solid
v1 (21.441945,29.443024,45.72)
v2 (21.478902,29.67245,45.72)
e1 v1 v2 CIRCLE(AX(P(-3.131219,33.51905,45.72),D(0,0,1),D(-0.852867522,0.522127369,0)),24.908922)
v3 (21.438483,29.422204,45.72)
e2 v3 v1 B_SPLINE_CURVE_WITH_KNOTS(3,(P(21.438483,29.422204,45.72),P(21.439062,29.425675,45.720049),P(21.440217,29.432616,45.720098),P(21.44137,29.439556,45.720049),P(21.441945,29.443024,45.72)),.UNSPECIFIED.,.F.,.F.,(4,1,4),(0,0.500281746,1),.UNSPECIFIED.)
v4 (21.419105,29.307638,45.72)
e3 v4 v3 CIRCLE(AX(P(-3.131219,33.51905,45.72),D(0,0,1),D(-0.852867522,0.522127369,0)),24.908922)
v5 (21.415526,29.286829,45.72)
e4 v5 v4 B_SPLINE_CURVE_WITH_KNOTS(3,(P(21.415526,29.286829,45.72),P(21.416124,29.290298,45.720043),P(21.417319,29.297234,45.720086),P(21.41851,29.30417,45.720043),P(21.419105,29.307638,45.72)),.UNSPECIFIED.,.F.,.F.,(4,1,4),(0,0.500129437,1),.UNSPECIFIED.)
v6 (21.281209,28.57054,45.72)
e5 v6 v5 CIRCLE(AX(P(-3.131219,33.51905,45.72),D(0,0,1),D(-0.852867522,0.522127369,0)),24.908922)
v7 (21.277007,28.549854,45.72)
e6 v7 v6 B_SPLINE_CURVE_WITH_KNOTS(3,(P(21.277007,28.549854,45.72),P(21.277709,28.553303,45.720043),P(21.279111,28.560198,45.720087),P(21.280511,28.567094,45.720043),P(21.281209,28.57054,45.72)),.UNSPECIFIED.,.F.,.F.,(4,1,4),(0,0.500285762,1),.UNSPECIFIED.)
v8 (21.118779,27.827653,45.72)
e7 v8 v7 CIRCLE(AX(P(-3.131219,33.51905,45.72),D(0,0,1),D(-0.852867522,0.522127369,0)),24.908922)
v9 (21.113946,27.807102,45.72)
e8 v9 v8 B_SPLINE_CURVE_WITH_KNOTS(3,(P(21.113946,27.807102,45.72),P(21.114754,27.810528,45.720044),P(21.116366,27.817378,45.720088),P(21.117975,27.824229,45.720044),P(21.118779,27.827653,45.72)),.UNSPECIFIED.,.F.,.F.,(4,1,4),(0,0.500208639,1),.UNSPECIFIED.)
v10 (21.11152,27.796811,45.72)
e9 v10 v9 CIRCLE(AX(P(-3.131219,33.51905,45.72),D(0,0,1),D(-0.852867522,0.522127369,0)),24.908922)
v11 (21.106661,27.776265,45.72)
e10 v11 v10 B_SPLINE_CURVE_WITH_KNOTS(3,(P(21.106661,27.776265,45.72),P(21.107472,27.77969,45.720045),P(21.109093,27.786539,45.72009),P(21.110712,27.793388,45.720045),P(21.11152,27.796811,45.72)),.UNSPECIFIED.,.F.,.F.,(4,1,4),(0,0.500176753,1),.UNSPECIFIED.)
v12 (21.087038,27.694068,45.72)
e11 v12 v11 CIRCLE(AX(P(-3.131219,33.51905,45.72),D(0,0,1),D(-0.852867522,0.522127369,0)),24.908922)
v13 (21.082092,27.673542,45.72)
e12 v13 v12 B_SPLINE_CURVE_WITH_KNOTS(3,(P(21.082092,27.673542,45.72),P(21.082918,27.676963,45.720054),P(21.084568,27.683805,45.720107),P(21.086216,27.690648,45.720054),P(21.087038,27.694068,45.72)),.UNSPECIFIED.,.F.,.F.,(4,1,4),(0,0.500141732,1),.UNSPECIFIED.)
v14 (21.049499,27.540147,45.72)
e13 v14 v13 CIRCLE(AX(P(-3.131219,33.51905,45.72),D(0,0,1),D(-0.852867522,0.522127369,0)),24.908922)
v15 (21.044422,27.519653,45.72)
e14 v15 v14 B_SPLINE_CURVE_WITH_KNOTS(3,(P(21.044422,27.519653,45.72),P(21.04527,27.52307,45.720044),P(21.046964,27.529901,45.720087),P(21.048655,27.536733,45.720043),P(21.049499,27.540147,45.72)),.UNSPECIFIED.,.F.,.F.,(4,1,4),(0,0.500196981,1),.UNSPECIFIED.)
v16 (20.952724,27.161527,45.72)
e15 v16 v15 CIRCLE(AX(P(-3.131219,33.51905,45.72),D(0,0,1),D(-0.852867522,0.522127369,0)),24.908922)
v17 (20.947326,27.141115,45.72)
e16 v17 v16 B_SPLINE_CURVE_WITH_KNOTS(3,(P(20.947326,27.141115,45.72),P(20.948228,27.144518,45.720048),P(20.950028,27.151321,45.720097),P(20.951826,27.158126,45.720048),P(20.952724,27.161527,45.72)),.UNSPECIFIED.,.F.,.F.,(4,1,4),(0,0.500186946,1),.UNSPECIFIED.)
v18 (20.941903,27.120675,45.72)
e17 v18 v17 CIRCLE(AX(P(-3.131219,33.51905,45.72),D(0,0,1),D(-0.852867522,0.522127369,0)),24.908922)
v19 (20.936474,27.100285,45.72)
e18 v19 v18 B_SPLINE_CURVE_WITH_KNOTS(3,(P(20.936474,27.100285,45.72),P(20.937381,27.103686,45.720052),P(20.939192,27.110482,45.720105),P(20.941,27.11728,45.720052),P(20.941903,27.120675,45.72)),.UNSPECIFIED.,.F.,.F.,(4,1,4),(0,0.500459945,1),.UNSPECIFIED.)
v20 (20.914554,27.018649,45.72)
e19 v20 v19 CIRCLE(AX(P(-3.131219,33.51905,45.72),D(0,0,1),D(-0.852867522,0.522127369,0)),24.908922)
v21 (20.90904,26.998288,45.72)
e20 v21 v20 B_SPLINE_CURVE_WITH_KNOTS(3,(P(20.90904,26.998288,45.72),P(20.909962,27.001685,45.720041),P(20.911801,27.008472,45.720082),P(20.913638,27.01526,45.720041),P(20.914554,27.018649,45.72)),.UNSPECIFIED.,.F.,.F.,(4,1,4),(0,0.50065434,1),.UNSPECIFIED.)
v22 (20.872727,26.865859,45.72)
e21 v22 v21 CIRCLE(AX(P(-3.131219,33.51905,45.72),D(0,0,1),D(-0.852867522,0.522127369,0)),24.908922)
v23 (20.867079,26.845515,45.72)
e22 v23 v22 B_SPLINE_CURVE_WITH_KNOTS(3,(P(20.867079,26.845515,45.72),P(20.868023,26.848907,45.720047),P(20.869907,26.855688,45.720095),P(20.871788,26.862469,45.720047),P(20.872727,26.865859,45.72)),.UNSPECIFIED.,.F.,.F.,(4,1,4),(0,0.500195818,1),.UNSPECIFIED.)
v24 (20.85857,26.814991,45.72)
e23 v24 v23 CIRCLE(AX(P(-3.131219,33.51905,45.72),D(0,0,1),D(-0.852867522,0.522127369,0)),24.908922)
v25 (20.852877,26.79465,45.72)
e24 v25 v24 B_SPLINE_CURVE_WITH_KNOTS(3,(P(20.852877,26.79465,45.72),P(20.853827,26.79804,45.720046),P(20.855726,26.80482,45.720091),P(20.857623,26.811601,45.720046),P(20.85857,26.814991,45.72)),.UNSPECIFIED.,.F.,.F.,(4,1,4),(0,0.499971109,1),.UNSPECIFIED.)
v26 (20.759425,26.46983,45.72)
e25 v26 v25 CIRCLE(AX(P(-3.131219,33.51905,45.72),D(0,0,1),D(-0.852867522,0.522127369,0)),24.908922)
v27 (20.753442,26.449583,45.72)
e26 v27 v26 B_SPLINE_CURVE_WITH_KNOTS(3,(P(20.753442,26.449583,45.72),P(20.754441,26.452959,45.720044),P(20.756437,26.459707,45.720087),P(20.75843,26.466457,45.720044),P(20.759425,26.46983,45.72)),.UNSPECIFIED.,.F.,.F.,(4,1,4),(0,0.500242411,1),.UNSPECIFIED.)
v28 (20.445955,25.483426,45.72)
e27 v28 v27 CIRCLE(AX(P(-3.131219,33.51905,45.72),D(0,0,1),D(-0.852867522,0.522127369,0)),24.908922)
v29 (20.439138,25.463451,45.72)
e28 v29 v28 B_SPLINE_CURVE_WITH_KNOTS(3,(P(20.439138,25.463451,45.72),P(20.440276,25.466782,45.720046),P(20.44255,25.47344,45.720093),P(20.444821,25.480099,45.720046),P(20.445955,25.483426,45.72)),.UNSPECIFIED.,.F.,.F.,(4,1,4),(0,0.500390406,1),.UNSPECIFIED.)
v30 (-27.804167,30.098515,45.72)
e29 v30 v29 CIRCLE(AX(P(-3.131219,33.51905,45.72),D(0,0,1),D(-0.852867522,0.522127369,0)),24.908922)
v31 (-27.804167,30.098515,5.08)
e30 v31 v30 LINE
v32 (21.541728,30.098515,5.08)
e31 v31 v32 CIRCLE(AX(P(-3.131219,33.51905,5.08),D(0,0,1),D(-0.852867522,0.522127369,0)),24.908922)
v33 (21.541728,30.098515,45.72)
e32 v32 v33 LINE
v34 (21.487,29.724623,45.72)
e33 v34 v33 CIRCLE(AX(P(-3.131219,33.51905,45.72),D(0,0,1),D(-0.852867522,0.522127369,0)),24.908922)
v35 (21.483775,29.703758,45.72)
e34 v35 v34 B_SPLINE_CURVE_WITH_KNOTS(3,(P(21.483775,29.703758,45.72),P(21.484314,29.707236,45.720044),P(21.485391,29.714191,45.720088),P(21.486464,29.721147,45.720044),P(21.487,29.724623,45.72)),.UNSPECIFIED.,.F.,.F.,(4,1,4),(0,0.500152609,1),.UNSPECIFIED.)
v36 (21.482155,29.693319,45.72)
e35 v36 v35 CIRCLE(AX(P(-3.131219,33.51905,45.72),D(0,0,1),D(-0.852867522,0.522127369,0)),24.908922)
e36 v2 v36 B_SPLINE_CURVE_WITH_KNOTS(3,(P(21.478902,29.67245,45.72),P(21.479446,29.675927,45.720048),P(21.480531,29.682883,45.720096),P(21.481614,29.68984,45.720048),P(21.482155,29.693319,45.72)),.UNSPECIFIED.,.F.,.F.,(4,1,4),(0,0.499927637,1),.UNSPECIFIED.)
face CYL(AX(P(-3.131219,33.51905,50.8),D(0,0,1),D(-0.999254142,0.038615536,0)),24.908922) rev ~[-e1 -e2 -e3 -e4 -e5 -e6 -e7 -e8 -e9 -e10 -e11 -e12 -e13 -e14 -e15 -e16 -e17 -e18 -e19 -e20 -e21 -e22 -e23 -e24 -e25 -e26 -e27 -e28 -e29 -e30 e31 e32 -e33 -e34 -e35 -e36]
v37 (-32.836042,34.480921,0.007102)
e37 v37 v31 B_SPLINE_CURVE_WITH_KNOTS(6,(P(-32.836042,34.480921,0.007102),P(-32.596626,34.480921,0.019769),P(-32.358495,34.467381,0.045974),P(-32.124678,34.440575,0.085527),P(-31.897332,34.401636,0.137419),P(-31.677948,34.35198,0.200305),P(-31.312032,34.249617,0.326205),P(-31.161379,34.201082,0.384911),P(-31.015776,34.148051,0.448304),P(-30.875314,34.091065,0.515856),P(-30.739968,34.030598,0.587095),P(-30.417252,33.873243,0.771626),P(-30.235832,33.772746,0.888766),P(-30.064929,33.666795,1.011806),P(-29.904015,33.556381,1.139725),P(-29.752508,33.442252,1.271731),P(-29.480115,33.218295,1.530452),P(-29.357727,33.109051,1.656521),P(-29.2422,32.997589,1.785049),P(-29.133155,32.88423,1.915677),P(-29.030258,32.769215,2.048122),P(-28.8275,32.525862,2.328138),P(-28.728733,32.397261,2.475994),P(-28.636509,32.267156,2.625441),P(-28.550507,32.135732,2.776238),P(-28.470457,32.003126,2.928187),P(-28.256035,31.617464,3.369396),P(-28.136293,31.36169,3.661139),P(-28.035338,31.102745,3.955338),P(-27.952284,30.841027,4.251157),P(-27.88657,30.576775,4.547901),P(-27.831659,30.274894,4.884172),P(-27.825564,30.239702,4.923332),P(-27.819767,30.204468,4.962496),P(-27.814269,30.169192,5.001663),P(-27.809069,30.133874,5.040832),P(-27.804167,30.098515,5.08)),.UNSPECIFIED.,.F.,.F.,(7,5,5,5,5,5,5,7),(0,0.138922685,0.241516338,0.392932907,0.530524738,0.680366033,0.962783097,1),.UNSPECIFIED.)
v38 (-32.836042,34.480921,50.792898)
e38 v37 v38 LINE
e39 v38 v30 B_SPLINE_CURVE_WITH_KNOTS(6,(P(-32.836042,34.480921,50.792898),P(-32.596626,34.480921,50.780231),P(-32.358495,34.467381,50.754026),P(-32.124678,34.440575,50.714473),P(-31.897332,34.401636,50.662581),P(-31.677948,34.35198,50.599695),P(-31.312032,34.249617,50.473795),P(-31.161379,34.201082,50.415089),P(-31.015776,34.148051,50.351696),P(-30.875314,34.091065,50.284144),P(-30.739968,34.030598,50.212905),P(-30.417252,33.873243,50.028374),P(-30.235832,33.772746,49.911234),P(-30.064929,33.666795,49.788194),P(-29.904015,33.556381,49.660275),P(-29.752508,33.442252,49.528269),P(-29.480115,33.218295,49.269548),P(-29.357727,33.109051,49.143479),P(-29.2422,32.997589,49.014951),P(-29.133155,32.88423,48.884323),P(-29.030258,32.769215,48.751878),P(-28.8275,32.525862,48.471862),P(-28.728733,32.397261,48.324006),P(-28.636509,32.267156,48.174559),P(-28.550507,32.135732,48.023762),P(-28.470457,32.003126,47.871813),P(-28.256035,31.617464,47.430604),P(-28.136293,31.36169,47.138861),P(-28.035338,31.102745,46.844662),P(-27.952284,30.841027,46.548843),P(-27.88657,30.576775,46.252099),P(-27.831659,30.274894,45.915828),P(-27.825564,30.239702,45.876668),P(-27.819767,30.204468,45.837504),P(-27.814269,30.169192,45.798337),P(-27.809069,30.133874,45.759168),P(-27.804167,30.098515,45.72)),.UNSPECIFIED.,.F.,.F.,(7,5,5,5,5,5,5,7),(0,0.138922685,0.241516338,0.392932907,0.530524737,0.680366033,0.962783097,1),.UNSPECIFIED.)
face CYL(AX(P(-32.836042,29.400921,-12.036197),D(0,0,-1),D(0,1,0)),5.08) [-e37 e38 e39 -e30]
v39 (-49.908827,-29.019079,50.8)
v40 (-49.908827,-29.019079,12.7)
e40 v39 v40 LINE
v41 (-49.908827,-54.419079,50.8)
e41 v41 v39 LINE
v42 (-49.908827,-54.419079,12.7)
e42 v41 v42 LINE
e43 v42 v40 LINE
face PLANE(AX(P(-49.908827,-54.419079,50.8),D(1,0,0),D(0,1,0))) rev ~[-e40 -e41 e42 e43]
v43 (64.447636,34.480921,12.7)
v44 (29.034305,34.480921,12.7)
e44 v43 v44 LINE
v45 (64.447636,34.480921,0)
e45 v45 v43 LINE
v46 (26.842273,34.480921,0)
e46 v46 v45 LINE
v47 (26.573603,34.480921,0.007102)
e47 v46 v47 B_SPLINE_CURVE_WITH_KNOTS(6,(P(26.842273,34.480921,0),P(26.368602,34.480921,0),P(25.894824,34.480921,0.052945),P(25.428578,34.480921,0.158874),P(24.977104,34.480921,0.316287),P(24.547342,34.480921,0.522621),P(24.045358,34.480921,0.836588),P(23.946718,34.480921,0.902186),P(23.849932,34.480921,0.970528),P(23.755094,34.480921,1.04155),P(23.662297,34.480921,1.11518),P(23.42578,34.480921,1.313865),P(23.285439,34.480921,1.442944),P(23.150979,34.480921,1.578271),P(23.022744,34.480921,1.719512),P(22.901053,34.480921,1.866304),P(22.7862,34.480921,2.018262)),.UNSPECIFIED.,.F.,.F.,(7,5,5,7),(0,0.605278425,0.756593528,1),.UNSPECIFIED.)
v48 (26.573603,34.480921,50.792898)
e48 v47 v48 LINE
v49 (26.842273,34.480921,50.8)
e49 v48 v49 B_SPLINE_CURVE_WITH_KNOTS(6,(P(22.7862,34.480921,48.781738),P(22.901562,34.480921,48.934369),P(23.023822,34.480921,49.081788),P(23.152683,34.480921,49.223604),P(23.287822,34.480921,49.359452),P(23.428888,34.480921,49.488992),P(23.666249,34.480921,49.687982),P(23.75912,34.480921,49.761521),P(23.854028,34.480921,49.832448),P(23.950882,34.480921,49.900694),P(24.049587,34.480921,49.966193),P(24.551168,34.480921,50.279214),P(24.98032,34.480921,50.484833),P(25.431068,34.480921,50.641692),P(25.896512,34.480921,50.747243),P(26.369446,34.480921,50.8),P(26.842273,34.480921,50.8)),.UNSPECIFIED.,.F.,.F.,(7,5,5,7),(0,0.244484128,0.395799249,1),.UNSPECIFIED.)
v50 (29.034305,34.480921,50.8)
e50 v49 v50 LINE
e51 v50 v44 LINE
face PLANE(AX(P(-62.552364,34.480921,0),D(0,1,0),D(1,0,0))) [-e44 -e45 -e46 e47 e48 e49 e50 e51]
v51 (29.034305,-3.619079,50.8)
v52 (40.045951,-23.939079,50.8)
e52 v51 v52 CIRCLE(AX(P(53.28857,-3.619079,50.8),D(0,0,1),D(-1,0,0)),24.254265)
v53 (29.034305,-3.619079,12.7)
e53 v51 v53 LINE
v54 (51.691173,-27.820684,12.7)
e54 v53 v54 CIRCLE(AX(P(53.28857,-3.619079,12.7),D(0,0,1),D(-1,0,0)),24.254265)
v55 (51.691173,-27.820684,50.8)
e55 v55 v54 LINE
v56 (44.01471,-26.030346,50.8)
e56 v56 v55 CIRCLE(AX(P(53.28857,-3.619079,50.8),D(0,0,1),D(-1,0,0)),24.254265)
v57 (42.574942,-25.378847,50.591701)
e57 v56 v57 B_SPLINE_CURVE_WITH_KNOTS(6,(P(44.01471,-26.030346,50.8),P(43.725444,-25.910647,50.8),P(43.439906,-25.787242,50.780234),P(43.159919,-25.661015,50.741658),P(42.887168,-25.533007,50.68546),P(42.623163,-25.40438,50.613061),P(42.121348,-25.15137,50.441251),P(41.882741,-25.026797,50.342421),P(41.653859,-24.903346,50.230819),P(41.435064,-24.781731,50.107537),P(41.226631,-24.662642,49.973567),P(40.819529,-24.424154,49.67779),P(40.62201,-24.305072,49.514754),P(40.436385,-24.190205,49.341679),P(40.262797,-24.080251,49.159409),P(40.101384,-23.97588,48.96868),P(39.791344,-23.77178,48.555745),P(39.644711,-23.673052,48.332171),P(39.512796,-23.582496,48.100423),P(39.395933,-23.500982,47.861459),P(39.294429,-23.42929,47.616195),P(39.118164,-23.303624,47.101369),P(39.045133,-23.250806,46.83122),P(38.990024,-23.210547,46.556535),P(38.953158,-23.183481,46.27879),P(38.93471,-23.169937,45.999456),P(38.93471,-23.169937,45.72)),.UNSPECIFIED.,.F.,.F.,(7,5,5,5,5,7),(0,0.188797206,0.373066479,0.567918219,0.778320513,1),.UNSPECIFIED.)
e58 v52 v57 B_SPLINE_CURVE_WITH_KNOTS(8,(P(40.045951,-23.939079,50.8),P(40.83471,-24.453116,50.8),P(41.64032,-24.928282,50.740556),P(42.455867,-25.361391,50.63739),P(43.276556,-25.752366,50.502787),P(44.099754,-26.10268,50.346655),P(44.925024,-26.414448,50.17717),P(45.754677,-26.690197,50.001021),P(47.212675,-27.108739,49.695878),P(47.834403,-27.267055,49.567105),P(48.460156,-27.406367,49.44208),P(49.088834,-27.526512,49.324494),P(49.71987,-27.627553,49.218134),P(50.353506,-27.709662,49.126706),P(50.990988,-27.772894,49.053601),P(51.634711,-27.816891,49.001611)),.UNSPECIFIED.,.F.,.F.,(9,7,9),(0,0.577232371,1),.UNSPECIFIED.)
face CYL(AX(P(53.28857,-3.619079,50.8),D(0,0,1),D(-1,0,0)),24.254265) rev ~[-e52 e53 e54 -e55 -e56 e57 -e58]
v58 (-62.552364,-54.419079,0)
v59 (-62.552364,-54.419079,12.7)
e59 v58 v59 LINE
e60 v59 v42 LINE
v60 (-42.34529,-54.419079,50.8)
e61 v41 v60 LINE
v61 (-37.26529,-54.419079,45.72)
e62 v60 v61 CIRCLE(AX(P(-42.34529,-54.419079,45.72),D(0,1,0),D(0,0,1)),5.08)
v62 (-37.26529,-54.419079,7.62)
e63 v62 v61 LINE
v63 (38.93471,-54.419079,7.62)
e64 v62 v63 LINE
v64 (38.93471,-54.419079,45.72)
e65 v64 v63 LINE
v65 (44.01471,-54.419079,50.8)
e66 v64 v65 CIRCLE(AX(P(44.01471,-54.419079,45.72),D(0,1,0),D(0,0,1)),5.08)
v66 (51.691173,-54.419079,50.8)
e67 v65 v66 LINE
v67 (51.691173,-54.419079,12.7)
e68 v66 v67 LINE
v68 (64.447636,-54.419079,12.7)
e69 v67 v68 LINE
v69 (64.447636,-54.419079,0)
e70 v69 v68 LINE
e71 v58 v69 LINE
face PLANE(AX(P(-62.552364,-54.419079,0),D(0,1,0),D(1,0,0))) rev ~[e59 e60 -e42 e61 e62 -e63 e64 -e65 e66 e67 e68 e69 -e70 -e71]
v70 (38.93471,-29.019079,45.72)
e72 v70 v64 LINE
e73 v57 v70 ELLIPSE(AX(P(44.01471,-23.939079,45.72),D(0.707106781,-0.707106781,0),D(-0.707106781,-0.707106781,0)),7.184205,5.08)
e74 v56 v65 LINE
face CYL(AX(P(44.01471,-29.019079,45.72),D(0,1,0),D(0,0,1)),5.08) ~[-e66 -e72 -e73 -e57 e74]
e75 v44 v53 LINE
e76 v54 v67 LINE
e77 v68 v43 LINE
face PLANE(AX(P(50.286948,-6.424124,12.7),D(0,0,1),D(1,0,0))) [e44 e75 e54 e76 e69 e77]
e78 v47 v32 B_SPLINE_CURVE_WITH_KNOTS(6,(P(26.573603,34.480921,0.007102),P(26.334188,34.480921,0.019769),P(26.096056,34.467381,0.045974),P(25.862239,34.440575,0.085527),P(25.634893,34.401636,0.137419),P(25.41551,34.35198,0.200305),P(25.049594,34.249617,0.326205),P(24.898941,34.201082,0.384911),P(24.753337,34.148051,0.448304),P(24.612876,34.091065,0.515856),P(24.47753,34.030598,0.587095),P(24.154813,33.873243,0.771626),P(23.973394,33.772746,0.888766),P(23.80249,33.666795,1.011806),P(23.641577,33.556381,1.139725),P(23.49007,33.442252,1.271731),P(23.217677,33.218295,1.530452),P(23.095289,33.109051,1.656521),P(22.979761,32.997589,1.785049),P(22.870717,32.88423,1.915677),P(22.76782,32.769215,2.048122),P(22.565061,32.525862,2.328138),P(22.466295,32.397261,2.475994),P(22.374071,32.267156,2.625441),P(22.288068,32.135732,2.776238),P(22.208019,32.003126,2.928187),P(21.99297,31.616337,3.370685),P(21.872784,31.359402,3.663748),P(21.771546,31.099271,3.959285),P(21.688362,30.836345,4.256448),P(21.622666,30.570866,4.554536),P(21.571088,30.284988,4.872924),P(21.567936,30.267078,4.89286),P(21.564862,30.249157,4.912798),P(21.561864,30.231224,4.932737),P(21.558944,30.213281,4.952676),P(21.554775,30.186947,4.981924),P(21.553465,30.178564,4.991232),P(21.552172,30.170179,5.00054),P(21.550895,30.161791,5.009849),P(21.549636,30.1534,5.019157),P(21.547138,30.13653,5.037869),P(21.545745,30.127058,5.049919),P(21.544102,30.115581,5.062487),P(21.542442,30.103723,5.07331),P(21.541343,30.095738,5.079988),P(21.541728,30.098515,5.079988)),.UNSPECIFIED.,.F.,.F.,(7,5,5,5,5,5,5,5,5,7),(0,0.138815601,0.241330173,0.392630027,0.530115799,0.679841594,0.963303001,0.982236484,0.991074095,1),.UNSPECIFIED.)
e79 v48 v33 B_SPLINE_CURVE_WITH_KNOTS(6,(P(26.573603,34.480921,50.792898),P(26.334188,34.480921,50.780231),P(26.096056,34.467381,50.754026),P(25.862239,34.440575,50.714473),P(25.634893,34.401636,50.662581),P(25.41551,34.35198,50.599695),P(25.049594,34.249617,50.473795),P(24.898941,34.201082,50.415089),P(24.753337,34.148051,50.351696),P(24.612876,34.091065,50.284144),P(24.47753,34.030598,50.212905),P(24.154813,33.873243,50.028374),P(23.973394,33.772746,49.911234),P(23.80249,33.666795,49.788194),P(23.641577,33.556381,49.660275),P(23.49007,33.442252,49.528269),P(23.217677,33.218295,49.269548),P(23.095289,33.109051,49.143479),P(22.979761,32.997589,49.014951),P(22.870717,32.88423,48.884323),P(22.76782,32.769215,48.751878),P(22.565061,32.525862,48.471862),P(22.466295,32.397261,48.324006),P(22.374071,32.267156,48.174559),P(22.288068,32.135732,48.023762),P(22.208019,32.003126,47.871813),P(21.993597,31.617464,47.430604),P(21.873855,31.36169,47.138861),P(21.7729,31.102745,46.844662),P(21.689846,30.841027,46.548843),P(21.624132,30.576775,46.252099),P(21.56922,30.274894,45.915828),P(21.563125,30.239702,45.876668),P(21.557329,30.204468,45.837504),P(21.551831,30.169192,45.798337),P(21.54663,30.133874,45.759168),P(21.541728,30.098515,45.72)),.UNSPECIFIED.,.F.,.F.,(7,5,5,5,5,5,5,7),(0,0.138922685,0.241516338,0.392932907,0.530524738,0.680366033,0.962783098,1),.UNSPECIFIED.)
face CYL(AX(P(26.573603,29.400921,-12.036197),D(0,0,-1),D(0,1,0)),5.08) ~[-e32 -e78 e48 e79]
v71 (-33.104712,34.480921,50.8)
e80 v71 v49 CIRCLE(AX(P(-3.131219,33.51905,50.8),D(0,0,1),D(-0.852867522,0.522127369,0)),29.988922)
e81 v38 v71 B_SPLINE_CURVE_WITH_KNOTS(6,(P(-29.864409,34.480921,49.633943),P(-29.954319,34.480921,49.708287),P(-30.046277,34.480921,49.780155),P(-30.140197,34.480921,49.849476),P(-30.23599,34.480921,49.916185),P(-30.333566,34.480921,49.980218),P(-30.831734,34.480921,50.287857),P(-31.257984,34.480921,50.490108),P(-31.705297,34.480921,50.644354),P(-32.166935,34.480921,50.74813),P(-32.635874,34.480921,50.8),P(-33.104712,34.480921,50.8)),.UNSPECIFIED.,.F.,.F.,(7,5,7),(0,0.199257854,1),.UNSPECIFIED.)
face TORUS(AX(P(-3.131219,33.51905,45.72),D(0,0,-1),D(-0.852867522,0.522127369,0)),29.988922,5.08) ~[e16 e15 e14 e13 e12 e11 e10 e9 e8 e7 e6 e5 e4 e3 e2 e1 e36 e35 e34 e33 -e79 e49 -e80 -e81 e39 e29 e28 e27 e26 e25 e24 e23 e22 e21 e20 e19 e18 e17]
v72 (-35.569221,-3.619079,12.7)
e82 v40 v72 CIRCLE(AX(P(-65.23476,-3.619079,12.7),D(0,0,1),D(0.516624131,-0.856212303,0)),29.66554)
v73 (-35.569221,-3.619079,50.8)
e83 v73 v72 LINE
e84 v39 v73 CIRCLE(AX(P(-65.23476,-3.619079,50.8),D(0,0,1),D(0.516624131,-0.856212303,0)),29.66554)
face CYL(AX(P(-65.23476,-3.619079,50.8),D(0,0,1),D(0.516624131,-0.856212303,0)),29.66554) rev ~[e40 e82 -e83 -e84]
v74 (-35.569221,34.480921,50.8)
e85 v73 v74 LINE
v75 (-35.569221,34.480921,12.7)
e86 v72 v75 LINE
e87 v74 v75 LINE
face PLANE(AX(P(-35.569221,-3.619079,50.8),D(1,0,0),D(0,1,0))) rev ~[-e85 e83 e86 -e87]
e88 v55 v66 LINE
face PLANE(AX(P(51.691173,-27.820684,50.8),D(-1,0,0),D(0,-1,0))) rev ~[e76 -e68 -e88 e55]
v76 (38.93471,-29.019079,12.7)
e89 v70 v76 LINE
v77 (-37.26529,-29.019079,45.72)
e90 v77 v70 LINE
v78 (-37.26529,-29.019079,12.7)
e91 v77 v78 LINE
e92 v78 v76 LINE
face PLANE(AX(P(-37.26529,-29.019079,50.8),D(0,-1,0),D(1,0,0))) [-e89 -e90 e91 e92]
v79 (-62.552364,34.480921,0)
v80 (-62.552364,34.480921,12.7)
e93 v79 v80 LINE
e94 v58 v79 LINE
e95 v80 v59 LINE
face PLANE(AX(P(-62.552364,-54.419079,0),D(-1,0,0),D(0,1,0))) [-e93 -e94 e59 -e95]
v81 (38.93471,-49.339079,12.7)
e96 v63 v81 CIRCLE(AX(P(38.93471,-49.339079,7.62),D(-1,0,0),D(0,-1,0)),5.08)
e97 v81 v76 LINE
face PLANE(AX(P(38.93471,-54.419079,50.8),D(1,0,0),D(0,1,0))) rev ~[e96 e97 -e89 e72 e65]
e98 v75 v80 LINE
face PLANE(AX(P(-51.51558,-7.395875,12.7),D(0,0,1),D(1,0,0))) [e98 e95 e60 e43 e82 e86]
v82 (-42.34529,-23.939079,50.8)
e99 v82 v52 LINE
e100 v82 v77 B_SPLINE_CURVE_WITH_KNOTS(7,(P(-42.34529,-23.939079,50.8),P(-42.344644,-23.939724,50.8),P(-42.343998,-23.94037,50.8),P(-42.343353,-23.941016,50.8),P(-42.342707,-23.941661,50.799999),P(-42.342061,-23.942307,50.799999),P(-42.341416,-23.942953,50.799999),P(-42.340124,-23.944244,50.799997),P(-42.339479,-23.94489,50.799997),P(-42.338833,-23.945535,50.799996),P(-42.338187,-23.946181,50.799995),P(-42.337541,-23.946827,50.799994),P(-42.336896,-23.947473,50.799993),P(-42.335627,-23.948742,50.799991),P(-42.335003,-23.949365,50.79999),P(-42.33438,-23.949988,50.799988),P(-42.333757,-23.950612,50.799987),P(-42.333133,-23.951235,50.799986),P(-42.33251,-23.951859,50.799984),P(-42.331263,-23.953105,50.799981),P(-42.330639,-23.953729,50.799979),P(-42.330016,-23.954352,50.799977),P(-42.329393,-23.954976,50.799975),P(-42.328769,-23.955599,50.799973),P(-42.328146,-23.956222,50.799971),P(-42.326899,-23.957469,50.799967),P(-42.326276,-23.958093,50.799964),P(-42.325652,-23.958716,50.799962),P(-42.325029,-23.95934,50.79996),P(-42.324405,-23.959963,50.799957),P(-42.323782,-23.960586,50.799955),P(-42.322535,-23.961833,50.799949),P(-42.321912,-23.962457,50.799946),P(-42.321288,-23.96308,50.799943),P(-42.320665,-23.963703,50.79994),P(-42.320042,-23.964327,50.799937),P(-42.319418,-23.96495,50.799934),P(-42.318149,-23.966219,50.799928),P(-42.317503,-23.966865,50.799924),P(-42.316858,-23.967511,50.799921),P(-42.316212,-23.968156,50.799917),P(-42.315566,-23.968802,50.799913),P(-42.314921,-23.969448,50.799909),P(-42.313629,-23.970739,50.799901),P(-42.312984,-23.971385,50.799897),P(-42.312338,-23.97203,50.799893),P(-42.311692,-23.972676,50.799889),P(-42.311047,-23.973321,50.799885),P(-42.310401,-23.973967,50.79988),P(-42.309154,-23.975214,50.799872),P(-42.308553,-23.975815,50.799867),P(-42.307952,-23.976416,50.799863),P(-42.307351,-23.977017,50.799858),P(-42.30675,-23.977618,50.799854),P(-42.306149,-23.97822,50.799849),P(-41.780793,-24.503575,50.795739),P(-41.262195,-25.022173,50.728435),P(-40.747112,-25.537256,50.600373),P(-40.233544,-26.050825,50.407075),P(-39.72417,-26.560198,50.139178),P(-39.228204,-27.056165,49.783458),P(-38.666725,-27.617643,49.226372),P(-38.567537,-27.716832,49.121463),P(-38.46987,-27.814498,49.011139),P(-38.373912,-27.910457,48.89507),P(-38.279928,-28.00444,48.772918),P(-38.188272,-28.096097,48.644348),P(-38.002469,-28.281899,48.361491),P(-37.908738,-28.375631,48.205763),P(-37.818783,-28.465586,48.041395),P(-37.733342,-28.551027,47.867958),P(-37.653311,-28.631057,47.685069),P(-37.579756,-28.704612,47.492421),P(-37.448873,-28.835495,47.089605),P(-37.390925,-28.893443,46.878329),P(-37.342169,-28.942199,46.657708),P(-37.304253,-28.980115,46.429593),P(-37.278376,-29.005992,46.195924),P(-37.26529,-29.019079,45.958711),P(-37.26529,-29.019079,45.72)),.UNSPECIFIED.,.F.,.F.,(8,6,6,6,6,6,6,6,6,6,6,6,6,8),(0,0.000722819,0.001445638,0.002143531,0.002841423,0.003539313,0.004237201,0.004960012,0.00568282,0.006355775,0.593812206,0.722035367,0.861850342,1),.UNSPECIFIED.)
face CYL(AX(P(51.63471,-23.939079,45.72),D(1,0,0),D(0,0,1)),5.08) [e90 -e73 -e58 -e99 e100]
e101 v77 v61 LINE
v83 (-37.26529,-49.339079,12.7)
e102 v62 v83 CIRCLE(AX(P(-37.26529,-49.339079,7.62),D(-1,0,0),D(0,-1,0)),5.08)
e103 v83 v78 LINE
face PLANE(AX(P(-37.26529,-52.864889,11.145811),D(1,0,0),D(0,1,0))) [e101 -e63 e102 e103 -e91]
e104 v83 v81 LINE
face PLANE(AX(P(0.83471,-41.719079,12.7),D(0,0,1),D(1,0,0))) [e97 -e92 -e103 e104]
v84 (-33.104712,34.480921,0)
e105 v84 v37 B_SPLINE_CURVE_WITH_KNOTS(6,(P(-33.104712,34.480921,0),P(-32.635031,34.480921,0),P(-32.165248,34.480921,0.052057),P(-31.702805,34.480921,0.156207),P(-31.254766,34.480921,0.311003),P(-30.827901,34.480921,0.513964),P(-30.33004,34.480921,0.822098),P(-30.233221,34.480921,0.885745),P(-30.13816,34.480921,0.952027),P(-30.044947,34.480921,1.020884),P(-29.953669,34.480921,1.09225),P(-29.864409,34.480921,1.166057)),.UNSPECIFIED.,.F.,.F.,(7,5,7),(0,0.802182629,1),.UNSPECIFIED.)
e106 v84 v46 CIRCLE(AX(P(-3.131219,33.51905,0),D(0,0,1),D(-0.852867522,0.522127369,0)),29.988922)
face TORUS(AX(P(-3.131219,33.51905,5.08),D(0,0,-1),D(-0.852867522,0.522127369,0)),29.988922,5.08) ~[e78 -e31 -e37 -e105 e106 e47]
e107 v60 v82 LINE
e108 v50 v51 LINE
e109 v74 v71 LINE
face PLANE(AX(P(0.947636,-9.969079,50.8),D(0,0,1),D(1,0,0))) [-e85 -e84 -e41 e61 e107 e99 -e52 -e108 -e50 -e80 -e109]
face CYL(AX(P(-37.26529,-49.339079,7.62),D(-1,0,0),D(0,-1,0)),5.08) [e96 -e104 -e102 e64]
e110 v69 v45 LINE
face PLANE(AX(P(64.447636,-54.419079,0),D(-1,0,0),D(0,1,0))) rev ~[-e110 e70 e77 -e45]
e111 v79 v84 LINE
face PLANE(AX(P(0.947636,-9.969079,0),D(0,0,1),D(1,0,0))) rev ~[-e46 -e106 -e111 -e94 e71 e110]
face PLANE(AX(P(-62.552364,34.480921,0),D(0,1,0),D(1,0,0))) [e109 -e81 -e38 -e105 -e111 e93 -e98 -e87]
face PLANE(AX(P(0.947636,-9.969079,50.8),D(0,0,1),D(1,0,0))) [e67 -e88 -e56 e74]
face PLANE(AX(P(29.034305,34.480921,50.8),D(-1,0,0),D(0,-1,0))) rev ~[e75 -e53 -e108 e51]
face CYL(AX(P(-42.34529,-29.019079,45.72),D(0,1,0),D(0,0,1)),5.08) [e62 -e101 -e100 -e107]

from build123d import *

# Parameters (mm, degrees)
F0_W         = 127
F0_H         = 88.9
F1_DEPTH     = 50.8
F3_DEPTH     = 76.2
F4_W         = 76.2
F4_H         = 25.4
F5_DEPTH     = 38.1
F7_DEPTH     = 38.1
F8_T1_DEPTH  = 76.2
F8_T3_DEPTH  = 38.1
F8_T5_DEPTH  = 74.8723933942
F8_T8_ANGLE  = 242.9501193557
F8_T10_ANGLE = 242.9501193557
F8_T15_DEPTH = 38.1
F8_S16_R     = 24.2542650998
F8_T17_DEPTH = 21
F8_T21_DEPTH = 88.9
F8_S22_R     = 24.2542650998
F8_T23_DEPTH = 46
F8_T30_DEPTH = 88.9
F8_S32_R     = 29.6655396369
F8_T33_DEPTH = 46
F8_T36_DEPTH = 38.1
F8_S38_R     = 29.6655396369
F8_T39_DEPTH = 21


# Not quite as in the source:
# - a fillet or chamfer that OpenCascade refuses, or shapes differently, is made with other operations: its cross-section is extruded or revolved along the edge and cut away or added


with BuildPart() as f1:
    # F0 (on Top) → F1 (new body)
    with BuildSketch(Plane.XY):
        with Locations((0.947636019, -9.969078747)):
            Rectangle(F0_W, F0_H)
    extrude(amount=F1_DEPTH)

    # F2 (on face) → F3 (cut)
    with BuildSketch(Plane.XY.offset(50.8)):
        with BuildLine():
            Line((21.7591244727, 34.480921253), (-28.0215628445, 34.480921253))
            ThreePointArc((-28.0215628445, 34.480921253), (-3.1312191859, 8.6101276845), (21.7591244727, 34.480921253))
        make_face()
    extrude(amount=-F3_DEPTH, mode=Mode.SUBTRACT)

    # F4 (on face) → F5 (cut)
    with BuildSketch(Plane.XY.offset(50.8)):
        with Locations((0.8347104251, -41.719078747)):
            Rectangle(F4_W, F4_H)
    extrude(amount=-F5_DEPTH, mode=Mode.SUBTRACT)

    # F6 (on face) → F7 (cut)
    with BuildSketch(Plane.XY.offset(50.8)):
        with BuildLine():
            Line((-62.552363981, -54.419078747), (-49.9088267779, -54.419078747))
            Line((-49.9088267779, -54.419078747), (-49.9088267779, -29.019078747))
            ThreePointArc((-49.9088267779, -29.019078747), (-39.401677619, -18.2031822516), (-35.5692207813, -3.619078747))
            Line((-35.5692207813, -3.619078747), (-35.5692207813, 34.480921253))
            Line((-35.5692207813, 34.480921253), (-62.552363981, 34.480921253))
            Line((-62.552363981, 34.480921253), (-62.552363981, -54.419078747))
        make_face()
        with BuildLine():
            Line((51.6911732221, -27.8206840158), (51.6911732221, -54.419078747))
            Line((51.6911732221, -54.419078747), (64.447636019, -54.419078747))
            Line((64.447636019, -54.419078747), (64.447636019, 34.480921253))
            Line((64.447636019, 34.480921253), (29.0343053639, 34.480921253))
            Line((29.0343053639, 34.480921253), (29.0343053639, -3.619078747))
            ThreePointArc((29.0343053639, -3.619078747), (35.5824546884, -20.1950505038), (51.6911732221, -27.8206840158))
        make_face()
    extrude(amount=-F7_DEPTH, mode=Mode.SUBTRACT)

    # F8: fillet of radius 5.08 on 8 edges, made by hand

    # F8_s2 → F8_t1 (cut)
    with BuildSketch(Plane.YZ.offset(-37.2652895749)):
        with BuildLine():
            ThreePointArc((-23.939078747, 50.8), (-27.5311811954, 49.3121024484), (-29.019078747, 45.72))
            Line((-29.019078747, 45.72), (-29.019078747, 50.8))
            Line((-29.019078747, 50.8), (-23.939078747, 50.8))
        make_face()
        with BuildLine():
            ThreePointArc((-54.419078747, 7.62), (-52.9311811954, 11.2121024484), (-49.339078747, 12.7))
            Line((-49.339078747, 12.7), (-54.419078747, 12.7))
            Line((-54.419078747, 12.7), (-54.419078747, 7.62))
        make_face()
    extrude(amount=F8_T1_DEPTH, mode=Mode.SUBTRACT)

    # F8_s4 → F8_t3 (cut)
    with BuildSketch(Plane.XZ.offset(29.019078747)):
        with BuildLine():
            ThreePointArc((-42.3452895749, 50.8), (-38.7531871264, 49.3121024484), (-37.2652895749, 45.72))
            Line((-37.2652895749, 45.72), (-37.2652895749, 50.8))
            Line((-37.2652895749, 50.8), (-42.3452895749, 50.8))
        make_face()
        with BuildLine():
            ThreePointArc((44.0147104251, 50.8), (40.4226079767, 49.3121024484), (38.9347104251, 45.72))
            Line((38.9347104251, 45.72), (38.9347104251, 50.8))
            Line((38.9347104251, 50.8), (44.0147104251, 50.8))
        make_face()
    extrude(amount=F8_T3_DEPTH, mode=Mode.SUBTRACT)

    # F8_s6 → F8_t5 (cut)
    with BuildSketch(Plane.XY.offset(-12.0361966971)):
        with BuildLine():
            ThreePointArc((26.5736031516, 34.480921253), (23.2372411895, 33.2317291127), (21.5417284952, 30.0985152915))
            ThreePointArc((21.5417284952, 30.0985152915), (21.7471113974, 32.2849220687), (21.7591244727, 34.480921253))
            Line((21.7591244727, 34.480921253), (26.5736031516, 34.480921253))
        make_face()
        with BuildLine():
            ThreePointArc((-32.8360415234, 34.480921253), (-29.4996795612, 33.2317291127), (-27.804166867, 30.0985152915))
            ThreePointArc((-27.804166867, 30.0985152915), (-28.0095497691, 32.2849220687), (-28.0215628445, 34.480921253))
            Line((-28.0215628445, 34.480921253), (-32.8360415234, 34.480921253))
        make_face()
    extrude(amount=F8_T5_DEPTH, mode=Mode.SUBTRACT)

    # F8_s7 → F8_t8 (revolve, cut)
    with BuildSketch(Plane(origin=(14.0725928873, 22.9868383553, 0), x_dir=(0, 0, 1), z_dir=(0.5221273689, 0.8528675224, 0))):
        with BuildLine():
            ThreePointArc((45.72, -45.0806506369), (49.3121024484, -46.5685481884), (50.8, -50.1606506369))
            Line((50.8, -50.1606506369), (50.8, -45.0806506369))
            Line((50.8, -45.0806506369), (45.72, -45.0806506369))
        make_face()
    revolve(axis=Axis((-3.1312191859, 33.5190498615, 50.8), (0, 0, 1)), revolution_arc=F8_T8_ANGLE, mode=Mode.SUBTRACT)

    # F8_s9 → F8_t10 (revolve, cut)
    with BuildSketch(Plane(origin=(14.0725928873, 22.9868383553, 0), x_dir=(0, 0, 1), z_dir=(0.5221273689, 0.8528675224, 0))):
        with BuildLine():
            ThreePointArc((0, -50.1606506369), (1.4878975516, -46.5685481884), (5.08, -45.0806506369))
            Line((5.08, -45.0806506369), (0, -45.0806506369))
            Line((0, -45.0806506369), (0, -50.1606506369))
        make_face()
    revolve(axis=Axis((-3.1312191859, 33.5190498615, 0), (0, 0, 1)), revolution_arc=F8_T10_ANGLE, mode=Mode.SUBTRACT)


with BuildPart() as f8_tool13:
    # F8_s14 → F8_t15 (new body)
    with BuildSketch(Plane.XZ.offset(54.419078747)):
        with BuildLine():
            ThreePointArc((44.0147104251, 50.8), (40.4226079767, 49.3121024484), (38.9347104251, 45.72))
            Line((38.9347104251, 45.72), (38.9347104251, 50.8))
            Line((38.9347104251, 50.8), (44.0147104251, 50.8))
        make_face()
    extrude(amount=-F8_T15_DEPTH)

    # F8_s16 → F8_t17 (cut, symmetric)
    with BuildSketch(Plane.XY.offset(48.3)):
        with Locations((53.2885704637, -3.619078747)):
            Circle(F8_S16_R)
    extrude(amount=F8_T17_DEPTH, both=True, mode=Mode.SUBTRACT)

    split(bisect_by=Plane.XZ.offset(29.019078747), keep=Keep.BOTTOM)


with BuildPart() as f8_tool19:
    # F8_s20 → F8_t21 (new body)
    with BuildSketch(Plane.YZ.offset(51.6347104251)):
        with BuildLine():
            ThreePointArc((-23.939078747, 50.8), (-27.5311811954, 49.3121024484), (-29.019078747, 45.72))
            Line((-29.019078747, 45.72), (-29.019078747, 50.8))
            Line((-29.019078747, 50.8), (-23.939078747, 50.8))
        make_face()
    extrude(amount=-F8_T21_DEPTH)

    # F8_s22 → F8_t23 (cut, symmetric)
    with BuildSketch(Plane.XY.offset(48.3)):
        with Locations((53.2885704637, -3.619078747)):
            Circle(F8_S22_R)
    extrude(amount=F8_T23_DEPTH, both=True, mode=Mode.SUBTRACT)

    split(bisect_by=Plane.YZ.offset(38.9347104251), keep=Keep.TOP)


with BuildPart() as f8_tool13_1:
    add(f8_tool13.part)

    # F8_t25: intersect F8_tool19
    add(f8_tool19.part, mode=Mode.INTERSECT)


with BuildPart() as f1_1:
    add(f1.part)

    # F8_t11: cut F8_tool13
    add(f8_tool13_1.part, mode=Mode.SUBTRACT)


with BuildPart() as f8_tool28:
    # F8_s29 → F8_t30 (new body)
    with BuildSketch(Plane.YZ.offset(38.9347104251)):
        with BuildLine():
            ThreePointArc((-23.939078747, 50.8), (-27.5311811954, 49.3121024484), (-29.019078747, 45.72))
            Line((-29.019078747, 45.72), (-29.019078747, 50.8))
            Line((-29.019078747, 50.8), (-23.939078747, 50.8))
        make_face()
    extrude(amount=-F8_T30_DEPTH)

    split(bisect_by=Plane.YZ.offset(-37.2652895749), keep=Keep.BOTTOM)

    # F8_s32 → F8_t33 (cut, symmetric)
    with BuildSketch(Plane.XY.offset(48.3)):
        with Locations((-65.2347604182, -3.619078747)):
            Circle(F8_S32_R)
    extrude(amount=F8_T33_DEPTH, both=True, mode=Mode.SUBTRACT)


with BuildPart() as f8_tool34:
    # F8_s35 → F8_t36 (new body)
    with BuildSketch(Plane.XZ.offset(16.319078747)):
        with BuildLine():
            ThreePointArc((-42.3452895749, 50.8), (-38.7531871264, 49.3121024484), (-37.2652895749, 45.72))
            Line((-37.2652895749, 45.72), (-37.2652895749, 50.8))
            Line((-37.2652895749, 50.8), (-42.3452895749, 50.8))
        make_face()
    extrude(amount=F8_T36_DEPTH)

    split(bisect_by=Plane.XZ.offset(29.019078747), keep=Keep.BOTTOM)

    # F8_s38 → F8_t39 (cut, symmetric)
    with BuildSketch(Plane.XY.offset(48.3)):
        with Locations((-65.2347604182, -3.619078747)):
            Circle(F8_S38_R)
    extrude(amount=F8_T39_DEPTH, both=True, mode=Mode.SUBTRACT)


with BuildPart() as f8_tool28_1:
    add(f8_tool28.part)

    # F8_t40: intersect F8_tool34
    add(f8_tool34.part, mode=Mode.INTERSECT)


with BuildPart() as f1_2:
    add(f1_1.part)

    # F8_t26: cut F8_tool28
    add(f8_tool28_1.part, mode=Mode.SUBTRACT)


solid = f1_2.part
